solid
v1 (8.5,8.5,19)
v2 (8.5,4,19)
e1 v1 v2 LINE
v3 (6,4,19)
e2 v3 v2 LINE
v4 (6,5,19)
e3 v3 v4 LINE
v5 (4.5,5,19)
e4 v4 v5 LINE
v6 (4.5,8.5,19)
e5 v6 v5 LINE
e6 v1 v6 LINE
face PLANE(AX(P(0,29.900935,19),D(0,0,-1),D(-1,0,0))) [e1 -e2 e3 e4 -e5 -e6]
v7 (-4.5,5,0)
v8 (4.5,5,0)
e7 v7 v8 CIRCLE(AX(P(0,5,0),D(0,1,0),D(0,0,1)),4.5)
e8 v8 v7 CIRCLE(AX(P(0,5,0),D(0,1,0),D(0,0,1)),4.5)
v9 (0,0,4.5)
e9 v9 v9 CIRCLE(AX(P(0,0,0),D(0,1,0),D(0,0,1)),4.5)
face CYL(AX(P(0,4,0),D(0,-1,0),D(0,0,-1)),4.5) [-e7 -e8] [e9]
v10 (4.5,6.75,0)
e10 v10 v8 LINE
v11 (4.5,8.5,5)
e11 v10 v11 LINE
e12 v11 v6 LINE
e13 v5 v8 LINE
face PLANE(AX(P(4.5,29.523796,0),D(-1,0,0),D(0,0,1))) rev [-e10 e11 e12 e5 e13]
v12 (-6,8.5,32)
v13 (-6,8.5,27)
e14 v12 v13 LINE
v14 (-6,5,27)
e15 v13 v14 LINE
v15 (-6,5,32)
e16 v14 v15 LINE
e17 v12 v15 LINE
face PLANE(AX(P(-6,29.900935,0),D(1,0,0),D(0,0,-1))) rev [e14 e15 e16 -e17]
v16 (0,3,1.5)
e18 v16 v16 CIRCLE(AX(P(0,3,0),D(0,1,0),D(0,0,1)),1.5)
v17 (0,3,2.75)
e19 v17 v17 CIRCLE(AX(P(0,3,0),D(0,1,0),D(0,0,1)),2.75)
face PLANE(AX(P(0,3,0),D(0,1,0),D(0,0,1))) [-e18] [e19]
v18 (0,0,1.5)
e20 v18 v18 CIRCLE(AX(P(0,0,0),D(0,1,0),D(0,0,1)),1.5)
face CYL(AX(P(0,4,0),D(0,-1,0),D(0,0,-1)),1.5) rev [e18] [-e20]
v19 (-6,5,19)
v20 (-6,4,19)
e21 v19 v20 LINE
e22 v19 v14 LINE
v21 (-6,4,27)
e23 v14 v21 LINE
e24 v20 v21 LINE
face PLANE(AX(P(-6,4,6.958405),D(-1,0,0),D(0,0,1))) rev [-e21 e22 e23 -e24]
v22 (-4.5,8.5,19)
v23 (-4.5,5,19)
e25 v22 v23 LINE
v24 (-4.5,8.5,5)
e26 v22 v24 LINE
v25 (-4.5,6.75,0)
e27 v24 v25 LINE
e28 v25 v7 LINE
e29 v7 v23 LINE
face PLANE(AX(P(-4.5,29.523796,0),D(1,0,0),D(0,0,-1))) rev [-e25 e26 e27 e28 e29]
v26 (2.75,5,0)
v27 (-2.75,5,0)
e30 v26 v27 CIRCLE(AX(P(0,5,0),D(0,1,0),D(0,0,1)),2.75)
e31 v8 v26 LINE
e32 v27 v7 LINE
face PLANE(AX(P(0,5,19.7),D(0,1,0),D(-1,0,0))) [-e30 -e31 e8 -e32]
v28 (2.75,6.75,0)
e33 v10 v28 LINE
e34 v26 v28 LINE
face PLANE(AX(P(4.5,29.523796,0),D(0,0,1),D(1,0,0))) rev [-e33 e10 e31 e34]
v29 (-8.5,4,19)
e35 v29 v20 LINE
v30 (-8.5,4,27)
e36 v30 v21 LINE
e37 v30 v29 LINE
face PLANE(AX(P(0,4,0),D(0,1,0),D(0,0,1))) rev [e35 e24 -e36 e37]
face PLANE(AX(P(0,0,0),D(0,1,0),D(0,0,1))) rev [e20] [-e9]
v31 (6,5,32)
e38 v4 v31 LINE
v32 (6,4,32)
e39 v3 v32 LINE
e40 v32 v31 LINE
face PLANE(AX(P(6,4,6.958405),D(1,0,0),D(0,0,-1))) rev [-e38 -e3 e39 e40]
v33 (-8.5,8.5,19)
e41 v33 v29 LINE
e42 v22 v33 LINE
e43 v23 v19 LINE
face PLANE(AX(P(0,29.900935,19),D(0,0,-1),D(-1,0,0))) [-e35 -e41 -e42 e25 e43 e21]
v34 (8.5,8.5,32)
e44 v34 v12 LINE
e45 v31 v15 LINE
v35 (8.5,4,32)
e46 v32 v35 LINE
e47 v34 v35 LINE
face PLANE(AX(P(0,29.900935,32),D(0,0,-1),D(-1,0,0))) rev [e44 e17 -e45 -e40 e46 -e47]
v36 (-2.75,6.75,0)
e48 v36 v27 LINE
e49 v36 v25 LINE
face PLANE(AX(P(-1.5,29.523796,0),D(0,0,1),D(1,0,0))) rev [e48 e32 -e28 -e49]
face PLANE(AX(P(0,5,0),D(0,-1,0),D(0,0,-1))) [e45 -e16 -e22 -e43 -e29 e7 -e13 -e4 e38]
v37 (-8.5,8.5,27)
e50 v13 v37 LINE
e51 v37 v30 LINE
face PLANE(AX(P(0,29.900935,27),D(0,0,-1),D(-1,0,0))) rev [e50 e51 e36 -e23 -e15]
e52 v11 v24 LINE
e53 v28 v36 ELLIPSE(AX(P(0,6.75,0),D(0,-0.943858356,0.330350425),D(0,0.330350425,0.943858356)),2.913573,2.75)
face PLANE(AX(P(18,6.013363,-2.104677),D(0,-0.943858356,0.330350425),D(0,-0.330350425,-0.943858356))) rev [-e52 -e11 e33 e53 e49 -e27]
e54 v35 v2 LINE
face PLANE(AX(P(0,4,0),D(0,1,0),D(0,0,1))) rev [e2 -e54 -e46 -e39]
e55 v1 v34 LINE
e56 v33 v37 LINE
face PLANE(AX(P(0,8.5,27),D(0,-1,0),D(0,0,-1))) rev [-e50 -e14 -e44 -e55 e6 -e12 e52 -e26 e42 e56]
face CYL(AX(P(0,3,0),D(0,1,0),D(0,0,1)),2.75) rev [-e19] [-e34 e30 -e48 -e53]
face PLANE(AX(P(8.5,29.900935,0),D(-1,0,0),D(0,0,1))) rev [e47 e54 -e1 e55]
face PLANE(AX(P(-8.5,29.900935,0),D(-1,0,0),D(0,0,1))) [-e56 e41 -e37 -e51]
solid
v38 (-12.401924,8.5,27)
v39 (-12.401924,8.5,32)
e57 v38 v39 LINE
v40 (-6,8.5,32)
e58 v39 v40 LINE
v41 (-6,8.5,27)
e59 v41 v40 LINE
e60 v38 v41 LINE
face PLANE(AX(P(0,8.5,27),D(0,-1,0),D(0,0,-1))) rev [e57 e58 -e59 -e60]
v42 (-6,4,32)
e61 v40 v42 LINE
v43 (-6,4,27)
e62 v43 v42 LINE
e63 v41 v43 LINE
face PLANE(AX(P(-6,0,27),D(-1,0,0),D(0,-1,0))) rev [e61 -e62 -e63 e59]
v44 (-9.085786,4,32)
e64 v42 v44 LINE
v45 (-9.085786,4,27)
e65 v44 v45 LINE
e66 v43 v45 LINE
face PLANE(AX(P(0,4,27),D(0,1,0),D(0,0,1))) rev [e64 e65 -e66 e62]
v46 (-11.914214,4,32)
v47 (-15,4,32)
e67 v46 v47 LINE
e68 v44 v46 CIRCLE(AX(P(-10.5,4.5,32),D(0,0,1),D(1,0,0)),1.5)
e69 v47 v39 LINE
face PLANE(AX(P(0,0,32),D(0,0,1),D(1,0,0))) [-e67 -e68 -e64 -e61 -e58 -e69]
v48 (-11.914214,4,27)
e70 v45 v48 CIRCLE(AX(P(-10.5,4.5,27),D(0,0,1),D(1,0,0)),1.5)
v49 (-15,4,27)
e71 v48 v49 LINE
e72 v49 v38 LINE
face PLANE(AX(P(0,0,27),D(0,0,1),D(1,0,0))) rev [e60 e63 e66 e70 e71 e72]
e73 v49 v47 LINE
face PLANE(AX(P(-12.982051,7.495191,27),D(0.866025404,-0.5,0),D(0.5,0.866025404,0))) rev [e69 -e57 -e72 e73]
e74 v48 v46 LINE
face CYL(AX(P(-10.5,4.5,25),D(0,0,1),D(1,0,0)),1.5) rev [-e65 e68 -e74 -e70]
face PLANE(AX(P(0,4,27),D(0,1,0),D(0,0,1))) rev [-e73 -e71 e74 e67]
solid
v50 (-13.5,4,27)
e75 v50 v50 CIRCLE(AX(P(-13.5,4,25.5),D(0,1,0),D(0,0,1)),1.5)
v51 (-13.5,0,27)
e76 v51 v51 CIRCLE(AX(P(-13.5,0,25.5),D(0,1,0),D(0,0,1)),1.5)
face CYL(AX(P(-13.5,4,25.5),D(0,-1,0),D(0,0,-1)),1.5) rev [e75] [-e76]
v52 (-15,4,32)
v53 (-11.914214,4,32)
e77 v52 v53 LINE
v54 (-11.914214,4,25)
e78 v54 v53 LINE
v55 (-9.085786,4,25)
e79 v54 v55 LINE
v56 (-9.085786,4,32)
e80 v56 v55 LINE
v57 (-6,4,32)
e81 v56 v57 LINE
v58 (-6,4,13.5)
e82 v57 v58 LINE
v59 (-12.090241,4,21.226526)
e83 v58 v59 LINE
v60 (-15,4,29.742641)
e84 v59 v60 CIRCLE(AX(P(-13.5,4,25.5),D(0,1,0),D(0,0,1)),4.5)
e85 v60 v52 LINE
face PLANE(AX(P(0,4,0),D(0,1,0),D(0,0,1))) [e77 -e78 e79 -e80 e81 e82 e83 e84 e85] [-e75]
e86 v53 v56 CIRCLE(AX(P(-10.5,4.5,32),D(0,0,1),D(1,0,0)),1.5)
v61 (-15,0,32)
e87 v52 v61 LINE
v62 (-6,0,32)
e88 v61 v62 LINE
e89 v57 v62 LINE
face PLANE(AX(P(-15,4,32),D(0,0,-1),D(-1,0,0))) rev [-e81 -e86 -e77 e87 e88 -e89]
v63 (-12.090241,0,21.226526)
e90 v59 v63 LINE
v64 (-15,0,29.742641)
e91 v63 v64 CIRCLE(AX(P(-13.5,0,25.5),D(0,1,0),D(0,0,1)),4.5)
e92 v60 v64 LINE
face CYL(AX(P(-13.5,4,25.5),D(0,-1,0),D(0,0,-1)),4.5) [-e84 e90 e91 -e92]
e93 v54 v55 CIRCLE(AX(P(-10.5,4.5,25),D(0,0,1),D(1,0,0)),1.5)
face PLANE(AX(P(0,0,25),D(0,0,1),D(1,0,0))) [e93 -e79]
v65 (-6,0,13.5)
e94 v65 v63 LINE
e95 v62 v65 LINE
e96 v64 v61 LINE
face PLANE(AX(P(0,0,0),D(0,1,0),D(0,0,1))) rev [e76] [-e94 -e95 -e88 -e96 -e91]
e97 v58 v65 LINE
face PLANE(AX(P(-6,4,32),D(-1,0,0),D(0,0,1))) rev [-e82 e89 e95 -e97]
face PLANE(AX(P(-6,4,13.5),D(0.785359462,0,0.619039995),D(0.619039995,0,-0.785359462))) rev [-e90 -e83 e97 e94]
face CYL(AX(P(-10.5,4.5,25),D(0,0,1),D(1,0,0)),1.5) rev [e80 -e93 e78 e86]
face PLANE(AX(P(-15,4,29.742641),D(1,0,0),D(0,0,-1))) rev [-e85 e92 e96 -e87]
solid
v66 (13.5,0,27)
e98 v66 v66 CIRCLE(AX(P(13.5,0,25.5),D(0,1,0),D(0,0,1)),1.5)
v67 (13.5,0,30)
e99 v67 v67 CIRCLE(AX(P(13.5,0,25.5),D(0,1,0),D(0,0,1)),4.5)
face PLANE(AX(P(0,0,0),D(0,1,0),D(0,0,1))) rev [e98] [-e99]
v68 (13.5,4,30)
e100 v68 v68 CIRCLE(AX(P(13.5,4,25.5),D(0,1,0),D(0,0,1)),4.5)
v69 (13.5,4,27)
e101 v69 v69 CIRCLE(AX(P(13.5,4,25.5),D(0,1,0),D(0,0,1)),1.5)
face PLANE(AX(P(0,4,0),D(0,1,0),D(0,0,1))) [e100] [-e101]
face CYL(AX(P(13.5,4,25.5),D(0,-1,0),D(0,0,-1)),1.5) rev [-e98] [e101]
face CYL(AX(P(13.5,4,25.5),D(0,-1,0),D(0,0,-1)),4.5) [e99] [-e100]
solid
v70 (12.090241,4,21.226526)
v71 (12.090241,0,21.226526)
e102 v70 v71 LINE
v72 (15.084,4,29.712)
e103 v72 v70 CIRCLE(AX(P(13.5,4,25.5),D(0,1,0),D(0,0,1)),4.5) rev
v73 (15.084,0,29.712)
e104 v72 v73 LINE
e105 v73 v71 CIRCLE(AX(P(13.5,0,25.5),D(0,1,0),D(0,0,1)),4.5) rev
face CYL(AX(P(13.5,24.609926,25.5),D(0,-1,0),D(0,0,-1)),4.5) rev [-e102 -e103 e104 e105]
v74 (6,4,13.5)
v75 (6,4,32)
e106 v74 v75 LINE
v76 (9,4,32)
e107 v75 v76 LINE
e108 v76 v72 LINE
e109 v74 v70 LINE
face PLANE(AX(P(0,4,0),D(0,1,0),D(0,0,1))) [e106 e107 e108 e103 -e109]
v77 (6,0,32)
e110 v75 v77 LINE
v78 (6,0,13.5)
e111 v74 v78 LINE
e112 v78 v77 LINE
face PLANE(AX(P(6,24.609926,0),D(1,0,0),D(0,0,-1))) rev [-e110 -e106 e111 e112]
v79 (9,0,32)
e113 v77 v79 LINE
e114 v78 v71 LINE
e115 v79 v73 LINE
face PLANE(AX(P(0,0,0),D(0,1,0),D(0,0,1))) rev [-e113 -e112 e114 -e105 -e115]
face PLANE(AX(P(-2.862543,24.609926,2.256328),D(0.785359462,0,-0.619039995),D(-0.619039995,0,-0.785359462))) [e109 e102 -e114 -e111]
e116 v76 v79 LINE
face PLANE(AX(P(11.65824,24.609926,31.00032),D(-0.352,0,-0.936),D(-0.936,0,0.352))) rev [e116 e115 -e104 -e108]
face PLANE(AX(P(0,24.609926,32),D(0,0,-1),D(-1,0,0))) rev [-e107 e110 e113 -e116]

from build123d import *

# Parameters (mm, degrees)
SKETCH_1_R               = 4.5
SKETCH_1_R_2             = 1.5
EXTRUDE_2_DEPTH          = 4
EXTRUDE_2_2_DEPTH        = 4
EXTRUDE_2_3_DEPTH        = 4
EXTRUDE_3_DEPTH          = 4
EXTRUDE_START            = -5
EXTRUDE_4_DEPTH          = 5
CUT_EXTRUDE_1_DEPTH      = 7
EXTRUDE_5_DEPTH          = 4
SKETCH_6_R               = 4.5
SKETCH_6_R_2             = 1.5
EXTRUDE_6_DEPTH          = 1
SKETCH_7_W               = 2.5
SKETCH_7_H               = 8
SKETCH_7_H_2             = 5
SKETCH_7_W_2             = 6
EXTRUDE_7_DEPTH          = 4.5
EXTRUDE_8_DEPTH          = 3.5
CUT_EXTRUDE_2_DEPTH      = 41.031237802
CUT_EXTRUDE_2_DEPTH_BACK = 41.031237802
CUT_EXTRUDE_START        = 5
SKETCH_10_R              = 2.75
CUT_EXTRUDE_3_DEPTH      = 7
SKETCH_11_W              = 12
SKETCH_11_H              = 1
CUT_EXTRUDE_4_DEPTH      = 13


# Read off the part's stored shape, not the designer's step: Бобышка-Вытянуть4
with BuildPart() as part:
    # Эскиз1 → Бобышка-Вытянуть2 (new body)
    with BuildSketch(Plane(origin=(0, 0, 0), x_dir=(1, 0, 0), z_dir=(0, 1, 0))):
        with Locations(Location((0, 0, 0), (0, 0, 270))):
            Circle(SKETCH_1_R)
        with Locations(Location((0, 0, 0), (0, 0, 270))):
            Circle(SKETCH_1_R_2, mode=Mode.SUBTRACT)
    extrude(amount=EXTRUDE_2_DEPTH)

    # Эскиз6 → Бобышка-Вытянуть6 (add)
    with BuildSketch(Plane(origin=(0, 4, 0), x_dir=(1, 0, 0), z_dir=(0, 1, 0))):
        with Locations(Location((0, 0, 0), (0, 0, 270))):
            Circle(SKETCH_6_R)
        with Locations(Location((0, 0, 0), (0, 0, 270))):
            Circle(SKETCH_6_R_2, mode=Mode.SUBTRACT)
    extrude(amount=EXTRUDE_6_DEPTH)



with BuildPart() as body_2:
    # Эскиз1 → Extrude 2 2 (new body)
    with BuildSketch(Plane(origin=(0, 0, 0), x_dir=(1, 0, 0), z_dir=(0, 1, 0))):
        with Locations(Location((13.5, -25.5, 0), (0, 0, 270))):
            Circle(SKETCH_1_R)
        with Locations(Location((13.5, -25.5, 0), (0, 0, 270))):
            Circle(SKETCH_1_R_2, mode=Mode.SUBTRACT)
    extrude(amount=EXTRUDE_2_2_DEPTH)


with BuildPart() as body_3:
    # Эскиз1 → Extrude 2 3 (new body)
    with BuildSketch(Plane(origin=(0, 0, 0), x_dir=(1, 0, 0), z_dir=(0, 1, 0))):
        with Locations(Location((-13.5, -25.5, 0), (0, 0, 270))):
            Circle(SKETCH_1_R)
        with Locations(Location((-13.5, -25.5, 0), (0, 0, 270))):
            Circle(SKETCH_1_R_2, mode=Mode.SUBTRACT)
    extrude(amount=EXTRUDE_2_3_DEPTH)

    # Эскиз2 → Бобышка-Вытянуть3 (add)
    with BuildSketch(Plane(origin=(0, 0, 0), x_dir=(1, 0, 0), z_dir=(0, 1, 0))):
        with BuildLine():
            Line((-15, -29.742640687), (-15, -32))
            Line((-15, -32), (-6, -32))
            Line((-6, -32), (-6, -13.5))
            Line((-6, -13.5), (-12.090241258, -21.22652597))
            ThreePointArc((-12.090241258, -21.22652597), (-9.241703587, -26.95496105), (-15, -29.742640687))
        make_face()
    extrude(amount=EXTRUDE_3_DEPTH)


with BuildPart() as body_4:
    # Бобышка-Вытянуть4 outline → Бобышка-Вытянуть4 (new body)
    with BuildSketch(Plane.XY.offset(32).offset(EXTRUDE_START)):
        Polygon((-12.401923789, 8.5), (-15, 4), (-6, 4), (-6, 8.5), align=None)
    extrude(amount=EXTRUDE_4_DEPTH)


with BuildPart() as cut_extrude_1_tool:
    # Эскиз4 → Вырез-Вытянуть1 (new body)
    with BuildSketch(Plane.XY.offset(32)):
        with BuildLine():
            ThreePointArc((-9.085786438, 4), (-9.021602161, 4.246347032), (-9, 4.5))
            ThreePointArc((-9, 4.5), (-10.753652968, 5.978397839), (-11.914213562, 4))
            Line((-11.914213562, 4), (-9.085786438, 4))
        make_face()
        with BuildLine():
            Line((-9.085786438, 4), (-11.914213562, 4))
            ThreePointArc((-11.914213562, 4), (-10.5, 3), (-9.085786438, 4))
        make_face()
    extrude(amount=-CUT_EXTRUDE_1_DEPTH)


with BuildPart() as body_3_1:
    add(body_3.part)

    # Вырез-Вытянуть1: cut by cut_extrude_1_tool
    add(cut_extrude_1_tool.part, mode=Mode.SUBTRACT)


with BuildPart() as body_4_1:
    add(body_4.part)

    # Вырез-Вытянуть1: cut by cut_extrude_1_tool
    add(cut_extrude_1_tool.part, mode=Mode.SUBTRACT)


with BuildPart() as body_5:
    # Эскиз5 → Бобышка-Вытянуть5 (new body)
    with BuildSketch(Plane(origin=(0, 0, 0), x_dir=(1, 0, 0), z_dir=(0, 1, 0))):
        with BuildLine():
            Line((6, -32), (9, -32))
            Line((9, -32), (15.084, -29.712))
            ThreePointArc((15.084, -29.712), (9.256368609, -26.997194916), (12.090241258, -21.22652597))
            Line((12.090241258, -21.22652597), (6, -13.5))
            Line((6, -13.5), (6, -17.357142857))
            Line((6, -17.357142857), (6, -32))
        make_face()
    extrude(amount=EXTRUDE_5_DEPTH)


with BuildPart() as body_6:
    # Эскиз7 → Бобышка-Вытянуть7 (new body)
    with BuildSketch(Plane(origin=(0, 4, 0), x_dir=(1, 0, 0), z_dir=(0, 1, 0))):
        with Locations((7.25, -23)):
            Rectangle(SKETCH_7_W, SKETCH_7_H)
        with Locations((7.25, -29.5)):
            Rectangle(SKETCH_7_W, SKETCH_7_H_2)
        with Locations((3, -23)):
            Rectangle(SKETCH_7_W_2, SKETCH_7_H)
        with Locations((3, -29.5)):
            Rectangle(SKETCH_7_W_2, SKETCH_7_H_2)
        Polygon((0, -27), (0, -19), (-8.5, -19), (-8.5, -27), (-6, -27), align=None)
        with Locations((-3, -29.5)):
            Rectangle(SKETCH_7_W_2, SKETCH_7_H_2)
    extrude(amount=EXTRUDE_7_DEPTH)


with BuildPart() as part_1:
    add(part.part)

    add(body_6.part)  # Бобышка-Вытянуть8 merges body 6
    # Эскиз8 → Бобышка-Вытянуть8 (add)
    with BuildSketch(Plane(origin=(0, 5, 0), x_dir=(1, 0, 0), z_dir=(0, 1, 0))):
        with BuildLine():
            Line((4.5, 0), (4.5, -19))
            Line((4.5, -19), (-4.5, -19))
            Line((-4.5, -19), (-4.5, 0))
            Line((-4.5, 0), (-1.5, 0))
            ThreePointArc((-1.5, 0), (0, -1.5), (1.5, 0))
            Line((1.5, 0), (4.5, 0))
        make_face()
    extrude(amount=EXTRUDE_8_DEPTH)

    # Эскиз9 → Вырез-Вытянуть2 (cut, two sides: drawn at the far end of the back side and taken through both)
    with BuildSketch(Plane.ZY.offset(4.5).offset(-CUT_EXTRUDE_2_DEPTH_BACK)):
        Polygon((0, 8.5), (0, 6.75), (5, 8.5), align=None)
    extrude(amount=CUT_EXTRUDE_2_DEPTH + CUT_EXTRUDE_2_DEPTH_BACK, mode=Mode.SUBTRACT)

    # Эскиз10 → Вырез-Вытянуть3 (cut)
    with BuildSketch(Plane(origin=(0, 5, 0), x_dir=(1, 0, 0), z_dir=(0, 1, 0)).offset(CUT_EXTRUDE_START)):
        with Locations(Location((0, 0, 0), (0, 0, 270))):
            Circle(SKETCH_10_R)
    extrude(amount=-CUT_EXTRUDE_3_DEPTH, mode=Mode.SUBTRACT)

    # Эскиз11 → Вырез-Вытянуть4 (cut)
    with BuildSketch(Plane.XY.offset(32)):
        with Locations((0, 4.5)):
            Rectangle(SKETCH_11_W, SKETCH_11_H)
    extrude(amount=-CUT_EXTRUDE_4_DEPTH, mode=Mode.SUBTRACT)


solid = Compound([body_2.part, body_3_1.part, body_4_1.part, body_5.part, part_1.part])
